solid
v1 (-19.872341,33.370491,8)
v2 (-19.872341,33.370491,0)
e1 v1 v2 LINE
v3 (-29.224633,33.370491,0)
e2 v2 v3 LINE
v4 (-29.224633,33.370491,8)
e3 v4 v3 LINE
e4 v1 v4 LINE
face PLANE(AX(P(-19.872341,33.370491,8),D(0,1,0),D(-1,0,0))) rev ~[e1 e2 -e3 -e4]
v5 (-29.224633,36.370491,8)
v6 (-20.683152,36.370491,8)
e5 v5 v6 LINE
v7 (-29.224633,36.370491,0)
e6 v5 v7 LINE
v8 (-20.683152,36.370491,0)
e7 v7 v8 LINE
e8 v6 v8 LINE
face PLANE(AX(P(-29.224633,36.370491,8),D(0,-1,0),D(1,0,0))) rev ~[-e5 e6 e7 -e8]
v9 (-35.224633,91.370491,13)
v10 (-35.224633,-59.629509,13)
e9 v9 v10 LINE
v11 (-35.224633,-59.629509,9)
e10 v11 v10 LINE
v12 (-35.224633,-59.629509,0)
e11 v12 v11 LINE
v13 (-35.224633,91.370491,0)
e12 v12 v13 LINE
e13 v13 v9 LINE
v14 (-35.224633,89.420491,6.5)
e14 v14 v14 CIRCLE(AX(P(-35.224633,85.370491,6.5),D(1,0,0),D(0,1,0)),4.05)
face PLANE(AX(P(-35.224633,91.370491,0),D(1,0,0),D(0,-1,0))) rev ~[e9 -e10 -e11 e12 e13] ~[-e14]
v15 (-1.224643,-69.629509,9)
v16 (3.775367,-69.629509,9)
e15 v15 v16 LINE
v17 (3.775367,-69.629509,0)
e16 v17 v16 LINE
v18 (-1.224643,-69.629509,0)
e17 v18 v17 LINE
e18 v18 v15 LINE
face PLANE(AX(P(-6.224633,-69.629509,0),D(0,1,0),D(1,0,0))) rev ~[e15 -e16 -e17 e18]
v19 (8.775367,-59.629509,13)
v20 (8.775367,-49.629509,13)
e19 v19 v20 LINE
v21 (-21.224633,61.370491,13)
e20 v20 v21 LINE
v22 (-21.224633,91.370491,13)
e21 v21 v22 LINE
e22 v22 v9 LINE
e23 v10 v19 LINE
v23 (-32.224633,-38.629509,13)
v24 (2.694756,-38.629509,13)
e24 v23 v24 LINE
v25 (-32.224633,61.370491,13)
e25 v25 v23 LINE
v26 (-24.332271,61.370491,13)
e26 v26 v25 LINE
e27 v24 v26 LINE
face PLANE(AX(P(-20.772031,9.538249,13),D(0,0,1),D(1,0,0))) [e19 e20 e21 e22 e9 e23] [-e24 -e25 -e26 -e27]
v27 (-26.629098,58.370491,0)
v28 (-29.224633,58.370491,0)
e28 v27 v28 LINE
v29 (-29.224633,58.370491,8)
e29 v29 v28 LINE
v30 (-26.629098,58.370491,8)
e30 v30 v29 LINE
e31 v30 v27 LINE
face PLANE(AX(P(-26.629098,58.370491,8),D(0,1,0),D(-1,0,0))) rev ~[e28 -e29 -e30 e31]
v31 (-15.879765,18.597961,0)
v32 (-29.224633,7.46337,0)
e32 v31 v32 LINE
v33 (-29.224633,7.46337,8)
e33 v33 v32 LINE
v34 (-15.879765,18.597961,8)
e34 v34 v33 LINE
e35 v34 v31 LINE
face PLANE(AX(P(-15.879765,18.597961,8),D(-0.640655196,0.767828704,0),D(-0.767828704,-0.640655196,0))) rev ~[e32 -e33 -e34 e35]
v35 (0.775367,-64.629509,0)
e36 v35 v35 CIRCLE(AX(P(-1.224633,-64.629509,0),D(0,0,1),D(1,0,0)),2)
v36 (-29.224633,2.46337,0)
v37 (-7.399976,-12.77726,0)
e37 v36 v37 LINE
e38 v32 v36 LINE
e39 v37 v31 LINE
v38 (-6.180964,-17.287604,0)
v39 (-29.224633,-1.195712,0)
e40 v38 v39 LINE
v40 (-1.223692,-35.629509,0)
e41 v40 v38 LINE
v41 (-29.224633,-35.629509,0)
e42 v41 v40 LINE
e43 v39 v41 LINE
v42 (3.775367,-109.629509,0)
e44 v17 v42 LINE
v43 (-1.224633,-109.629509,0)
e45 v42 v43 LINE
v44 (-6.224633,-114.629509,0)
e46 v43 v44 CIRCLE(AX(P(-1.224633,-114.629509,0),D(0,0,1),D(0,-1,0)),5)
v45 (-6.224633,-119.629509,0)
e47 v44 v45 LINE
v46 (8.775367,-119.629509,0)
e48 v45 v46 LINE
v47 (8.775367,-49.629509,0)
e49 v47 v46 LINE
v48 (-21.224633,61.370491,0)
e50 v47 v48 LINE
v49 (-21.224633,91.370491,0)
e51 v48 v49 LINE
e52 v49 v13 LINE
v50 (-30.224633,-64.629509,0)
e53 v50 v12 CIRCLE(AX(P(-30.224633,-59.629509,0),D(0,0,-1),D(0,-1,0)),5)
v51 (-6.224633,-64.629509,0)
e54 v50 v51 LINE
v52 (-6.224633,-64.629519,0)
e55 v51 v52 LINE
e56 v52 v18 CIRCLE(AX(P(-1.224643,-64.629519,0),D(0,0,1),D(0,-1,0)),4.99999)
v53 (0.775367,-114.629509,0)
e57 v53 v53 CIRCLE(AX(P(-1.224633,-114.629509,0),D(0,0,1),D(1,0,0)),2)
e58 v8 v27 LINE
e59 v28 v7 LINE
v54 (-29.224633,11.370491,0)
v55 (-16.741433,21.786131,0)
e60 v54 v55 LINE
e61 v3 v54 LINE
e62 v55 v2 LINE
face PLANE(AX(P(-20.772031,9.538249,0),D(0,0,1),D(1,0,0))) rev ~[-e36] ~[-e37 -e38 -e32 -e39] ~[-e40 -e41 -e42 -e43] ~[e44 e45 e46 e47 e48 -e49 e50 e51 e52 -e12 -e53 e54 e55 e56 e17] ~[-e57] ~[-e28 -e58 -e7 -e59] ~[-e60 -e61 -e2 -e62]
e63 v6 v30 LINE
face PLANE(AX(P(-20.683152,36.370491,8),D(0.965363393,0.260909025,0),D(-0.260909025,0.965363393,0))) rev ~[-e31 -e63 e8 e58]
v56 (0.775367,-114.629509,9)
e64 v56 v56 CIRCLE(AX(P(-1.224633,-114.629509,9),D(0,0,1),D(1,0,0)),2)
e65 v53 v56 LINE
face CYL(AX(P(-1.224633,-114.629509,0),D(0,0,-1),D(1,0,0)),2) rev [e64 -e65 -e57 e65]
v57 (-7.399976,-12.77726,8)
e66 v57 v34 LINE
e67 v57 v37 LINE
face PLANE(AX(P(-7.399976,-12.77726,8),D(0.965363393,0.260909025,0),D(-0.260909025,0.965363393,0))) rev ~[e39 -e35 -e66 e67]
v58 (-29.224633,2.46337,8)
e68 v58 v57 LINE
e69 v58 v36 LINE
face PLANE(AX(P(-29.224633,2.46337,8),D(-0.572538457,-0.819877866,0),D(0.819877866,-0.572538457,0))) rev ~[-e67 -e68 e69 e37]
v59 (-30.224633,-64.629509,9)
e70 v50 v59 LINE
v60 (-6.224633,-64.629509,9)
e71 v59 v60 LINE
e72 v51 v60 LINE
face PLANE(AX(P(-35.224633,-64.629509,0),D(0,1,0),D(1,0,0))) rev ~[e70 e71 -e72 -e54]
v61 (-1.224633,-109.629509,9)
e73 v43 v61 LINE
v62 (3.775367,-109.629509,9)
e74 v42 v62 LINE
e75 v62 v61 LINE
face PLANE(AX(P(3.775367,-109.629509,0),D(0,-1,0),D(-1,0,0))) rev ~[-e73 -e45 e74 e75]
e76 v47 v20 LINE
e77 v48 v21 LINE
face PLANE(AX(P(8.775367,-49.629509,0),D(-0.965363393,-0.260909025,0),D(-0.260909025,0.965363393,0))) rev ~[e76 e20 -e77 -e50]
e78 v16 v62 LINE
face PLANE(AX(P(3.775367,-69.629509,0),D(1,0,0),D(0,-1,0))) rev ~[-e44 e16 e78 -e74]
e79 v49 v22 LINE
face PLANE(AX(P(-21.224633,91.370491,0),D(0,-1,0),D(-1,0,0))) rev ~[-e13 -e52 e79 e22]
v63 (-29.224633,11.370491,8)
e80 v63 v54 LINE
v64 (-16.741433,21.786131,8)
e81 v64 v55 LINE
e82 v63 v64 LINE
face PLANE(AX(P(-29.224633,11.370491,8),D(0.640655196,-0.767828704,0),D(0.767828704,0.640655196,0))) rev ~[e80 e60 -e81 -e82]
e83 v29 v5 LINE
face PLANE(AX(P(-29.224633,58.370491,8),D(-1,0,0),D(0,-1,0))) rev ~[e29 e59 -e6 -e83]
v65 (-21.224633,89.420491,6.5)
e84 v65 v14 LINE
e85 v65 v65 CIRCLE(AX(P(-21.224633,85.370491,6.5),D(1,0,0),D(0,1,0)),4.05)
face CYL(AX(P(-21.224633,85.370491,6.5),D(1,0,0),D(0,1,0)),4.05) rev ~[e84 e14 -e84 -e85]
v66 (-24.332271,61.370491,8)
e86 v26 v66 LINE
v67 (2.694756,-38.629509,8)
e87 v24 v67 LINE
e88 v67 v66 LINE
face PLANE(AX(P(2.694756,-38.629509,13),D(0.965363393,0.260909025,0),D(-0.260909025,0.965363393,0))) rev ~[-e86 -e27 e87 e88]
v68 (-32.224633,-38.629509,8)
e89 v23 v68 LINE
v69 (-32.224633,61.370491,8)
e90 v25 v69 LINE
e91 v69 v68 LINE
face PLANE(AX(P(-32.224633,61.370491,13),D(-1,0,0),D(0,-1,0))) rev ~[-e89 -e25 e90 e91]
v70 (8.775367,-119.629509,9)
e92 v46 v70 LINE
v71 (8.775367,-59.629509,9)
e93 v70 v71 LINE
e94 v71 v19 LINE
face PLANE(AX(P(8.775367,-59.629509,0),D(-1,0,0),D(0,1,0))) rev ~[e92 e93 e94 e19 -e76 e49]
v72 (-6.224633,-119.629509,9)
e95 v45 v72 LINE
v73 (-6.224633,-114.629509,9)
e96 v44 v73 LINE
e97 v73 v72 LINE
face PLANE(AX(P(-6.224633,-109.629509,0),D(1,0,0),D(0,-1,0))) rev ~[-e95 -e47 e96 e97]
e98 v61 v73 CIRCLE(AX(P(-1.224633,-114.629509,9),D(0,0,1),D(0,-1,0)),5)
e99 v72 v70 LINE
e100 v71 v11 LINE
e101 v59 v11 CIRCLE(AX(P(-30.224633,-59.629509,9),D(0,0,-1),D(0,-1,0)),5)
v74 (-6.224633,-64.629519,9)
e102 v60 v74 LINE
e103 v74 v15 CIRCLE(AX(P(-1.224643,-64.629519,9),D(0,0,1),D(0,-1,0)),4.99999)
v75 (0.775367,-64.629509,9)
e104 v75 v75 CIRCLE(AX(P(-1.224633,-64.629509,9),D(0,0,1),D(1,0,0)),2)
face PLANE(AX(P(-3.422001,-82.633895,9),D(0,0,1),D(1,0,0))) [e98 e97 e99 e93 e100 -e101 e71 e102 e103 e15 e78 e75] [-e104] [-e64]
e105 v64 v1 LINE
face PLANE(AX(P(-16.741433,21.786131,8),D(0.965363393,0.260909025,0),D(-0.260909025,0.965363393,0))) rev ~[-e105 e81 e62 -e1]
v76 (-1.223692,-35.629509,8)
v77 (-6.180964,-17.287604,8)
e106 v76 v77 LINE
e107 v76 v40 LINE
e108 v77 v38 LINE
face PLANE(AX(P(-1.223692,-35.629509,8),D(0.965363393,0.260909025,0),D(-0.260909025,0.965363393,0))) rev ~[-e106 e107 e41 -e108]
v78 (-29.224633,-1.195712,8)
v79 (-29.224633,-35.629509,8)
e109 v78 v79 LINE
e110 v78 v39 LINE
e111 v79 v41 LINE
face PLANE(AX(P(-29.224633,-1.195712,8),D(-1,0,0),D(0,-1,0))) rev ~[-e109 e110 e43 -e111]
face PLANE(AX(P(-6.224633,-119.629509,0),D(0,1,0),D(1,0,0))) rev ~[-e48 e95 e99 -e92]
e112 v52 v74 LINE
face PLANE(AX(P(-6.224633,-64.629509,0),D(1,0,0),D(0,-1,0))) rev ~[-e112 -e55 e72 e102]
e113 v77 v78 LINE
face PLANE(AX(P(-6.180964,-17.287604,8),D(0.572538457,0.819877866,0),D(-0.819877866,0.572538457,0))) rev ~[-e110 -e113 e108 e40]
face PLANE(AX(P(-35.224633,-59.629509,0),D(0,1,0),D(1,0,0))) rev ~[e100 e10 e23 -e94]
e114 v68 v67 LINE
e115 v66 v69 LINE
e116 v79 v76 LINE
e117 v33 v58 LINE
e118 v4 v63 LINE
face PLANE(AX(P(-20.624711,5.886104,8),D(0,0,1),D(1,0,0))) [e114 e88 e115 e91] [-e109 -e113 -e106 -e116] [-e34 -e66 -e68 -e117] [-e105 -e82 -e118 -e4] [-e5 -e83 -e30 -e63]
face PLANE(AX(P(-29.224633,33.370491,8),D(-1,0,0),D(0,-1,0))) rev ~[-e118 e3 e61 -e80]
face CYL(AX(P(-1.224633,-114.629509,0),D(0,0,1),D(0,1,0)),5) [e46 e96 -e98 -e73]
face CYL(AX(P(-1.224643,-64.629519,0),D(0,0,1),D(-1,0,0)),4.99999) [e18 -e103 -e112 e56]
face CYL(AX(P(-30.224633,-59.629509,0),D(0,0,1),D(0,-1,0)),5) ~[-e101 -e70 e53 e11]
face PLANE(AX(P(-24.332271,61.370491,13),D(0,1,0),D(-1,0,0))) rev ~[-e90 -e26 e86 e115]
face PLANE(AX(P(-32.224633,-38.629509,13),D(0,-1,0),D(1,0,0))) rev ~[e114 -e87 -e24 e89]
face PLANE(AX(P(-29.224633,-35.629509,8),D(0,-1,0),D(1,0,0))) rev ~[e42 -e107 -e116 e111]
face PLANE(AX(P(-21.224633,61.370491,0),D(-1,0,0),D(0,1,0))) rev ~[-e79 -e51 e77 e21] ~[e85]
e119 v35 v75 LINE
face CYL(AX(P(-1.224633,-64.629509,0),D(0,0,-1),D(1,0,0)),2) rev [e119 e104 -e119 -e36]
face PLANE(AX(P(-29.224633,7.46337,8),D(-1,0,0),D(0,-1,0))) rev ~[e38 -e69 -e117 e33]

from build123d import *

# Parameters (mm, degrees)
F0_R      = 2
F1_DEPTH  = 9
F2_DEPTH  = 13
F4_DEPTH  = 5
F6_DEPTH  = 8.001
F7_R      = 4.99999
F8_R      = 5
F9_R      = 5
F10_R     = 4.05
F11_DEPTH = 14.001


# Not quite as in the source:
# - a fillet or chamfer is up to 0.001 mm smaller than in the source, because OpenCascade refuses the exact size


with BuildPart() as f1:
    # F0 (on Top) → F1 (new body)
    with BuildSketch(Plane.XY):
        Polygon((8.7753673922, -59.6295086741), (-35.2246326078, -59.6295086741), (-35.2246326078, -64.6295086741), (-6.2246326078, -64.6295086741), (-6.2246326078, -69.6295086741), (3.7753673922, -69.6295086741), (3.7753673922, -109.6295086741), (-6.2246326078, -109.6295086741), (-6.2246326078, -119.6295086741), (8.7753673922, -119.6295086741), align=None)
        with Locations((-1.2246326078, -114.6295086741)):
            Circle(F0_R, mode=Mode.SUBTRACT)
        with Locations((-1.2246326078, -64.6295086741)):
            Circle(F0_R, mode=Mode.SUBTRACT)
    extrude(amount=F1_DEPTH)

    # F0 (on Top) → F2 (join)
    with BuildSketch(Plane.XY):
        Polygon((-21.2246326078, 61.3704913259), (-21.2246326078, 91.3704913259), (-35.2246326078, 91.3704913259), (-35.2246326078, -59.6295086741), (8.7753673922, -59.6295086741), (8.7753673922, -49.6295086741), align=None)
    extrude(amount=F2_DEPTH)

    # F3 (on face) → F4 (cut)
    with BuildSketch(Plane.XY.offset(13)):
        Polygon((2.6947563819, -38.6295086741), (-24.3322706451, 61.3704913259), (-32.2246326078, 61.3704913259), (-32.2246326078, -38.6295086741), align=None)
    extrude(amount=-F4_DEPTH, mode=Mode.SUBTRACT)

    # F5 (on face) → F6 (cut, through all)
    with BuildSketch(Plane.XY.offset(8)):
        Polygon((-26.6290978716, 58.3704913259), (-29.2246326078, 58.3704913259), (-29.2246326078, 36.3704913259), (-20.6831519256, 36.3704913259), align=None)
        Polygon((-19.8723411148, 33.3704913259), (-29.2246326078, 33.3704913259), (-29.2246326078, 11.3704913259), (-16.7414328131, 21.7861306095), align=None)
        Polygon((-15.879765316, 18.5979608701), (-29.2246326078, 7.463369877), (-29.2246326078, 2.463369877), (-7.3999758243, -12.777260249), align=None)
        Polygon((-6.1809639439, -17.2876042066), (-29.2246326078, -1.1957117047), (-29.2246326078, -35.6295086741), (-1.2236924662, -35.6295086741), align=None)
    extrude(amount=-F6_DEPTH, mode=Mode.SUBTRACT)

    # F7 (radius 5 in the source; OpenCascade refuses exactly that, so slightly less here)
    f7_edges = [f1.edges().sort_by_distance(p)[0] for p in [
        (-6.224633, -69.629509, 4.5),
    ]]
    fillet(f7_edges, radius=F7_R)

    # F8
    f8_edges = [f1.edges().sort_by_distance(p)[0] for p in [
        (-6.224633, -109.629509, 4.5),
    ]]
    fillet(f8_edges, radius=F8_R)

    # F9
    f9_edges = [f1.edges().sort_by_distance(p)[0] for p in [
        (-35.224633, -64.629509, 4.5),
    ]]
    fillet(f9_edges, radius=F9_R)

    # F10 (on face) → F11 (cut, through all)
    with BuildSketch(Plane.YZ.offset(-21.2246326078)):
        with Locations((85.3704913259, 6.5)):
            Circle(F10_R)
    extrude(amount=-F11_DEPTH, mode=Mode.SUBTRACT)


solid = f1.part
